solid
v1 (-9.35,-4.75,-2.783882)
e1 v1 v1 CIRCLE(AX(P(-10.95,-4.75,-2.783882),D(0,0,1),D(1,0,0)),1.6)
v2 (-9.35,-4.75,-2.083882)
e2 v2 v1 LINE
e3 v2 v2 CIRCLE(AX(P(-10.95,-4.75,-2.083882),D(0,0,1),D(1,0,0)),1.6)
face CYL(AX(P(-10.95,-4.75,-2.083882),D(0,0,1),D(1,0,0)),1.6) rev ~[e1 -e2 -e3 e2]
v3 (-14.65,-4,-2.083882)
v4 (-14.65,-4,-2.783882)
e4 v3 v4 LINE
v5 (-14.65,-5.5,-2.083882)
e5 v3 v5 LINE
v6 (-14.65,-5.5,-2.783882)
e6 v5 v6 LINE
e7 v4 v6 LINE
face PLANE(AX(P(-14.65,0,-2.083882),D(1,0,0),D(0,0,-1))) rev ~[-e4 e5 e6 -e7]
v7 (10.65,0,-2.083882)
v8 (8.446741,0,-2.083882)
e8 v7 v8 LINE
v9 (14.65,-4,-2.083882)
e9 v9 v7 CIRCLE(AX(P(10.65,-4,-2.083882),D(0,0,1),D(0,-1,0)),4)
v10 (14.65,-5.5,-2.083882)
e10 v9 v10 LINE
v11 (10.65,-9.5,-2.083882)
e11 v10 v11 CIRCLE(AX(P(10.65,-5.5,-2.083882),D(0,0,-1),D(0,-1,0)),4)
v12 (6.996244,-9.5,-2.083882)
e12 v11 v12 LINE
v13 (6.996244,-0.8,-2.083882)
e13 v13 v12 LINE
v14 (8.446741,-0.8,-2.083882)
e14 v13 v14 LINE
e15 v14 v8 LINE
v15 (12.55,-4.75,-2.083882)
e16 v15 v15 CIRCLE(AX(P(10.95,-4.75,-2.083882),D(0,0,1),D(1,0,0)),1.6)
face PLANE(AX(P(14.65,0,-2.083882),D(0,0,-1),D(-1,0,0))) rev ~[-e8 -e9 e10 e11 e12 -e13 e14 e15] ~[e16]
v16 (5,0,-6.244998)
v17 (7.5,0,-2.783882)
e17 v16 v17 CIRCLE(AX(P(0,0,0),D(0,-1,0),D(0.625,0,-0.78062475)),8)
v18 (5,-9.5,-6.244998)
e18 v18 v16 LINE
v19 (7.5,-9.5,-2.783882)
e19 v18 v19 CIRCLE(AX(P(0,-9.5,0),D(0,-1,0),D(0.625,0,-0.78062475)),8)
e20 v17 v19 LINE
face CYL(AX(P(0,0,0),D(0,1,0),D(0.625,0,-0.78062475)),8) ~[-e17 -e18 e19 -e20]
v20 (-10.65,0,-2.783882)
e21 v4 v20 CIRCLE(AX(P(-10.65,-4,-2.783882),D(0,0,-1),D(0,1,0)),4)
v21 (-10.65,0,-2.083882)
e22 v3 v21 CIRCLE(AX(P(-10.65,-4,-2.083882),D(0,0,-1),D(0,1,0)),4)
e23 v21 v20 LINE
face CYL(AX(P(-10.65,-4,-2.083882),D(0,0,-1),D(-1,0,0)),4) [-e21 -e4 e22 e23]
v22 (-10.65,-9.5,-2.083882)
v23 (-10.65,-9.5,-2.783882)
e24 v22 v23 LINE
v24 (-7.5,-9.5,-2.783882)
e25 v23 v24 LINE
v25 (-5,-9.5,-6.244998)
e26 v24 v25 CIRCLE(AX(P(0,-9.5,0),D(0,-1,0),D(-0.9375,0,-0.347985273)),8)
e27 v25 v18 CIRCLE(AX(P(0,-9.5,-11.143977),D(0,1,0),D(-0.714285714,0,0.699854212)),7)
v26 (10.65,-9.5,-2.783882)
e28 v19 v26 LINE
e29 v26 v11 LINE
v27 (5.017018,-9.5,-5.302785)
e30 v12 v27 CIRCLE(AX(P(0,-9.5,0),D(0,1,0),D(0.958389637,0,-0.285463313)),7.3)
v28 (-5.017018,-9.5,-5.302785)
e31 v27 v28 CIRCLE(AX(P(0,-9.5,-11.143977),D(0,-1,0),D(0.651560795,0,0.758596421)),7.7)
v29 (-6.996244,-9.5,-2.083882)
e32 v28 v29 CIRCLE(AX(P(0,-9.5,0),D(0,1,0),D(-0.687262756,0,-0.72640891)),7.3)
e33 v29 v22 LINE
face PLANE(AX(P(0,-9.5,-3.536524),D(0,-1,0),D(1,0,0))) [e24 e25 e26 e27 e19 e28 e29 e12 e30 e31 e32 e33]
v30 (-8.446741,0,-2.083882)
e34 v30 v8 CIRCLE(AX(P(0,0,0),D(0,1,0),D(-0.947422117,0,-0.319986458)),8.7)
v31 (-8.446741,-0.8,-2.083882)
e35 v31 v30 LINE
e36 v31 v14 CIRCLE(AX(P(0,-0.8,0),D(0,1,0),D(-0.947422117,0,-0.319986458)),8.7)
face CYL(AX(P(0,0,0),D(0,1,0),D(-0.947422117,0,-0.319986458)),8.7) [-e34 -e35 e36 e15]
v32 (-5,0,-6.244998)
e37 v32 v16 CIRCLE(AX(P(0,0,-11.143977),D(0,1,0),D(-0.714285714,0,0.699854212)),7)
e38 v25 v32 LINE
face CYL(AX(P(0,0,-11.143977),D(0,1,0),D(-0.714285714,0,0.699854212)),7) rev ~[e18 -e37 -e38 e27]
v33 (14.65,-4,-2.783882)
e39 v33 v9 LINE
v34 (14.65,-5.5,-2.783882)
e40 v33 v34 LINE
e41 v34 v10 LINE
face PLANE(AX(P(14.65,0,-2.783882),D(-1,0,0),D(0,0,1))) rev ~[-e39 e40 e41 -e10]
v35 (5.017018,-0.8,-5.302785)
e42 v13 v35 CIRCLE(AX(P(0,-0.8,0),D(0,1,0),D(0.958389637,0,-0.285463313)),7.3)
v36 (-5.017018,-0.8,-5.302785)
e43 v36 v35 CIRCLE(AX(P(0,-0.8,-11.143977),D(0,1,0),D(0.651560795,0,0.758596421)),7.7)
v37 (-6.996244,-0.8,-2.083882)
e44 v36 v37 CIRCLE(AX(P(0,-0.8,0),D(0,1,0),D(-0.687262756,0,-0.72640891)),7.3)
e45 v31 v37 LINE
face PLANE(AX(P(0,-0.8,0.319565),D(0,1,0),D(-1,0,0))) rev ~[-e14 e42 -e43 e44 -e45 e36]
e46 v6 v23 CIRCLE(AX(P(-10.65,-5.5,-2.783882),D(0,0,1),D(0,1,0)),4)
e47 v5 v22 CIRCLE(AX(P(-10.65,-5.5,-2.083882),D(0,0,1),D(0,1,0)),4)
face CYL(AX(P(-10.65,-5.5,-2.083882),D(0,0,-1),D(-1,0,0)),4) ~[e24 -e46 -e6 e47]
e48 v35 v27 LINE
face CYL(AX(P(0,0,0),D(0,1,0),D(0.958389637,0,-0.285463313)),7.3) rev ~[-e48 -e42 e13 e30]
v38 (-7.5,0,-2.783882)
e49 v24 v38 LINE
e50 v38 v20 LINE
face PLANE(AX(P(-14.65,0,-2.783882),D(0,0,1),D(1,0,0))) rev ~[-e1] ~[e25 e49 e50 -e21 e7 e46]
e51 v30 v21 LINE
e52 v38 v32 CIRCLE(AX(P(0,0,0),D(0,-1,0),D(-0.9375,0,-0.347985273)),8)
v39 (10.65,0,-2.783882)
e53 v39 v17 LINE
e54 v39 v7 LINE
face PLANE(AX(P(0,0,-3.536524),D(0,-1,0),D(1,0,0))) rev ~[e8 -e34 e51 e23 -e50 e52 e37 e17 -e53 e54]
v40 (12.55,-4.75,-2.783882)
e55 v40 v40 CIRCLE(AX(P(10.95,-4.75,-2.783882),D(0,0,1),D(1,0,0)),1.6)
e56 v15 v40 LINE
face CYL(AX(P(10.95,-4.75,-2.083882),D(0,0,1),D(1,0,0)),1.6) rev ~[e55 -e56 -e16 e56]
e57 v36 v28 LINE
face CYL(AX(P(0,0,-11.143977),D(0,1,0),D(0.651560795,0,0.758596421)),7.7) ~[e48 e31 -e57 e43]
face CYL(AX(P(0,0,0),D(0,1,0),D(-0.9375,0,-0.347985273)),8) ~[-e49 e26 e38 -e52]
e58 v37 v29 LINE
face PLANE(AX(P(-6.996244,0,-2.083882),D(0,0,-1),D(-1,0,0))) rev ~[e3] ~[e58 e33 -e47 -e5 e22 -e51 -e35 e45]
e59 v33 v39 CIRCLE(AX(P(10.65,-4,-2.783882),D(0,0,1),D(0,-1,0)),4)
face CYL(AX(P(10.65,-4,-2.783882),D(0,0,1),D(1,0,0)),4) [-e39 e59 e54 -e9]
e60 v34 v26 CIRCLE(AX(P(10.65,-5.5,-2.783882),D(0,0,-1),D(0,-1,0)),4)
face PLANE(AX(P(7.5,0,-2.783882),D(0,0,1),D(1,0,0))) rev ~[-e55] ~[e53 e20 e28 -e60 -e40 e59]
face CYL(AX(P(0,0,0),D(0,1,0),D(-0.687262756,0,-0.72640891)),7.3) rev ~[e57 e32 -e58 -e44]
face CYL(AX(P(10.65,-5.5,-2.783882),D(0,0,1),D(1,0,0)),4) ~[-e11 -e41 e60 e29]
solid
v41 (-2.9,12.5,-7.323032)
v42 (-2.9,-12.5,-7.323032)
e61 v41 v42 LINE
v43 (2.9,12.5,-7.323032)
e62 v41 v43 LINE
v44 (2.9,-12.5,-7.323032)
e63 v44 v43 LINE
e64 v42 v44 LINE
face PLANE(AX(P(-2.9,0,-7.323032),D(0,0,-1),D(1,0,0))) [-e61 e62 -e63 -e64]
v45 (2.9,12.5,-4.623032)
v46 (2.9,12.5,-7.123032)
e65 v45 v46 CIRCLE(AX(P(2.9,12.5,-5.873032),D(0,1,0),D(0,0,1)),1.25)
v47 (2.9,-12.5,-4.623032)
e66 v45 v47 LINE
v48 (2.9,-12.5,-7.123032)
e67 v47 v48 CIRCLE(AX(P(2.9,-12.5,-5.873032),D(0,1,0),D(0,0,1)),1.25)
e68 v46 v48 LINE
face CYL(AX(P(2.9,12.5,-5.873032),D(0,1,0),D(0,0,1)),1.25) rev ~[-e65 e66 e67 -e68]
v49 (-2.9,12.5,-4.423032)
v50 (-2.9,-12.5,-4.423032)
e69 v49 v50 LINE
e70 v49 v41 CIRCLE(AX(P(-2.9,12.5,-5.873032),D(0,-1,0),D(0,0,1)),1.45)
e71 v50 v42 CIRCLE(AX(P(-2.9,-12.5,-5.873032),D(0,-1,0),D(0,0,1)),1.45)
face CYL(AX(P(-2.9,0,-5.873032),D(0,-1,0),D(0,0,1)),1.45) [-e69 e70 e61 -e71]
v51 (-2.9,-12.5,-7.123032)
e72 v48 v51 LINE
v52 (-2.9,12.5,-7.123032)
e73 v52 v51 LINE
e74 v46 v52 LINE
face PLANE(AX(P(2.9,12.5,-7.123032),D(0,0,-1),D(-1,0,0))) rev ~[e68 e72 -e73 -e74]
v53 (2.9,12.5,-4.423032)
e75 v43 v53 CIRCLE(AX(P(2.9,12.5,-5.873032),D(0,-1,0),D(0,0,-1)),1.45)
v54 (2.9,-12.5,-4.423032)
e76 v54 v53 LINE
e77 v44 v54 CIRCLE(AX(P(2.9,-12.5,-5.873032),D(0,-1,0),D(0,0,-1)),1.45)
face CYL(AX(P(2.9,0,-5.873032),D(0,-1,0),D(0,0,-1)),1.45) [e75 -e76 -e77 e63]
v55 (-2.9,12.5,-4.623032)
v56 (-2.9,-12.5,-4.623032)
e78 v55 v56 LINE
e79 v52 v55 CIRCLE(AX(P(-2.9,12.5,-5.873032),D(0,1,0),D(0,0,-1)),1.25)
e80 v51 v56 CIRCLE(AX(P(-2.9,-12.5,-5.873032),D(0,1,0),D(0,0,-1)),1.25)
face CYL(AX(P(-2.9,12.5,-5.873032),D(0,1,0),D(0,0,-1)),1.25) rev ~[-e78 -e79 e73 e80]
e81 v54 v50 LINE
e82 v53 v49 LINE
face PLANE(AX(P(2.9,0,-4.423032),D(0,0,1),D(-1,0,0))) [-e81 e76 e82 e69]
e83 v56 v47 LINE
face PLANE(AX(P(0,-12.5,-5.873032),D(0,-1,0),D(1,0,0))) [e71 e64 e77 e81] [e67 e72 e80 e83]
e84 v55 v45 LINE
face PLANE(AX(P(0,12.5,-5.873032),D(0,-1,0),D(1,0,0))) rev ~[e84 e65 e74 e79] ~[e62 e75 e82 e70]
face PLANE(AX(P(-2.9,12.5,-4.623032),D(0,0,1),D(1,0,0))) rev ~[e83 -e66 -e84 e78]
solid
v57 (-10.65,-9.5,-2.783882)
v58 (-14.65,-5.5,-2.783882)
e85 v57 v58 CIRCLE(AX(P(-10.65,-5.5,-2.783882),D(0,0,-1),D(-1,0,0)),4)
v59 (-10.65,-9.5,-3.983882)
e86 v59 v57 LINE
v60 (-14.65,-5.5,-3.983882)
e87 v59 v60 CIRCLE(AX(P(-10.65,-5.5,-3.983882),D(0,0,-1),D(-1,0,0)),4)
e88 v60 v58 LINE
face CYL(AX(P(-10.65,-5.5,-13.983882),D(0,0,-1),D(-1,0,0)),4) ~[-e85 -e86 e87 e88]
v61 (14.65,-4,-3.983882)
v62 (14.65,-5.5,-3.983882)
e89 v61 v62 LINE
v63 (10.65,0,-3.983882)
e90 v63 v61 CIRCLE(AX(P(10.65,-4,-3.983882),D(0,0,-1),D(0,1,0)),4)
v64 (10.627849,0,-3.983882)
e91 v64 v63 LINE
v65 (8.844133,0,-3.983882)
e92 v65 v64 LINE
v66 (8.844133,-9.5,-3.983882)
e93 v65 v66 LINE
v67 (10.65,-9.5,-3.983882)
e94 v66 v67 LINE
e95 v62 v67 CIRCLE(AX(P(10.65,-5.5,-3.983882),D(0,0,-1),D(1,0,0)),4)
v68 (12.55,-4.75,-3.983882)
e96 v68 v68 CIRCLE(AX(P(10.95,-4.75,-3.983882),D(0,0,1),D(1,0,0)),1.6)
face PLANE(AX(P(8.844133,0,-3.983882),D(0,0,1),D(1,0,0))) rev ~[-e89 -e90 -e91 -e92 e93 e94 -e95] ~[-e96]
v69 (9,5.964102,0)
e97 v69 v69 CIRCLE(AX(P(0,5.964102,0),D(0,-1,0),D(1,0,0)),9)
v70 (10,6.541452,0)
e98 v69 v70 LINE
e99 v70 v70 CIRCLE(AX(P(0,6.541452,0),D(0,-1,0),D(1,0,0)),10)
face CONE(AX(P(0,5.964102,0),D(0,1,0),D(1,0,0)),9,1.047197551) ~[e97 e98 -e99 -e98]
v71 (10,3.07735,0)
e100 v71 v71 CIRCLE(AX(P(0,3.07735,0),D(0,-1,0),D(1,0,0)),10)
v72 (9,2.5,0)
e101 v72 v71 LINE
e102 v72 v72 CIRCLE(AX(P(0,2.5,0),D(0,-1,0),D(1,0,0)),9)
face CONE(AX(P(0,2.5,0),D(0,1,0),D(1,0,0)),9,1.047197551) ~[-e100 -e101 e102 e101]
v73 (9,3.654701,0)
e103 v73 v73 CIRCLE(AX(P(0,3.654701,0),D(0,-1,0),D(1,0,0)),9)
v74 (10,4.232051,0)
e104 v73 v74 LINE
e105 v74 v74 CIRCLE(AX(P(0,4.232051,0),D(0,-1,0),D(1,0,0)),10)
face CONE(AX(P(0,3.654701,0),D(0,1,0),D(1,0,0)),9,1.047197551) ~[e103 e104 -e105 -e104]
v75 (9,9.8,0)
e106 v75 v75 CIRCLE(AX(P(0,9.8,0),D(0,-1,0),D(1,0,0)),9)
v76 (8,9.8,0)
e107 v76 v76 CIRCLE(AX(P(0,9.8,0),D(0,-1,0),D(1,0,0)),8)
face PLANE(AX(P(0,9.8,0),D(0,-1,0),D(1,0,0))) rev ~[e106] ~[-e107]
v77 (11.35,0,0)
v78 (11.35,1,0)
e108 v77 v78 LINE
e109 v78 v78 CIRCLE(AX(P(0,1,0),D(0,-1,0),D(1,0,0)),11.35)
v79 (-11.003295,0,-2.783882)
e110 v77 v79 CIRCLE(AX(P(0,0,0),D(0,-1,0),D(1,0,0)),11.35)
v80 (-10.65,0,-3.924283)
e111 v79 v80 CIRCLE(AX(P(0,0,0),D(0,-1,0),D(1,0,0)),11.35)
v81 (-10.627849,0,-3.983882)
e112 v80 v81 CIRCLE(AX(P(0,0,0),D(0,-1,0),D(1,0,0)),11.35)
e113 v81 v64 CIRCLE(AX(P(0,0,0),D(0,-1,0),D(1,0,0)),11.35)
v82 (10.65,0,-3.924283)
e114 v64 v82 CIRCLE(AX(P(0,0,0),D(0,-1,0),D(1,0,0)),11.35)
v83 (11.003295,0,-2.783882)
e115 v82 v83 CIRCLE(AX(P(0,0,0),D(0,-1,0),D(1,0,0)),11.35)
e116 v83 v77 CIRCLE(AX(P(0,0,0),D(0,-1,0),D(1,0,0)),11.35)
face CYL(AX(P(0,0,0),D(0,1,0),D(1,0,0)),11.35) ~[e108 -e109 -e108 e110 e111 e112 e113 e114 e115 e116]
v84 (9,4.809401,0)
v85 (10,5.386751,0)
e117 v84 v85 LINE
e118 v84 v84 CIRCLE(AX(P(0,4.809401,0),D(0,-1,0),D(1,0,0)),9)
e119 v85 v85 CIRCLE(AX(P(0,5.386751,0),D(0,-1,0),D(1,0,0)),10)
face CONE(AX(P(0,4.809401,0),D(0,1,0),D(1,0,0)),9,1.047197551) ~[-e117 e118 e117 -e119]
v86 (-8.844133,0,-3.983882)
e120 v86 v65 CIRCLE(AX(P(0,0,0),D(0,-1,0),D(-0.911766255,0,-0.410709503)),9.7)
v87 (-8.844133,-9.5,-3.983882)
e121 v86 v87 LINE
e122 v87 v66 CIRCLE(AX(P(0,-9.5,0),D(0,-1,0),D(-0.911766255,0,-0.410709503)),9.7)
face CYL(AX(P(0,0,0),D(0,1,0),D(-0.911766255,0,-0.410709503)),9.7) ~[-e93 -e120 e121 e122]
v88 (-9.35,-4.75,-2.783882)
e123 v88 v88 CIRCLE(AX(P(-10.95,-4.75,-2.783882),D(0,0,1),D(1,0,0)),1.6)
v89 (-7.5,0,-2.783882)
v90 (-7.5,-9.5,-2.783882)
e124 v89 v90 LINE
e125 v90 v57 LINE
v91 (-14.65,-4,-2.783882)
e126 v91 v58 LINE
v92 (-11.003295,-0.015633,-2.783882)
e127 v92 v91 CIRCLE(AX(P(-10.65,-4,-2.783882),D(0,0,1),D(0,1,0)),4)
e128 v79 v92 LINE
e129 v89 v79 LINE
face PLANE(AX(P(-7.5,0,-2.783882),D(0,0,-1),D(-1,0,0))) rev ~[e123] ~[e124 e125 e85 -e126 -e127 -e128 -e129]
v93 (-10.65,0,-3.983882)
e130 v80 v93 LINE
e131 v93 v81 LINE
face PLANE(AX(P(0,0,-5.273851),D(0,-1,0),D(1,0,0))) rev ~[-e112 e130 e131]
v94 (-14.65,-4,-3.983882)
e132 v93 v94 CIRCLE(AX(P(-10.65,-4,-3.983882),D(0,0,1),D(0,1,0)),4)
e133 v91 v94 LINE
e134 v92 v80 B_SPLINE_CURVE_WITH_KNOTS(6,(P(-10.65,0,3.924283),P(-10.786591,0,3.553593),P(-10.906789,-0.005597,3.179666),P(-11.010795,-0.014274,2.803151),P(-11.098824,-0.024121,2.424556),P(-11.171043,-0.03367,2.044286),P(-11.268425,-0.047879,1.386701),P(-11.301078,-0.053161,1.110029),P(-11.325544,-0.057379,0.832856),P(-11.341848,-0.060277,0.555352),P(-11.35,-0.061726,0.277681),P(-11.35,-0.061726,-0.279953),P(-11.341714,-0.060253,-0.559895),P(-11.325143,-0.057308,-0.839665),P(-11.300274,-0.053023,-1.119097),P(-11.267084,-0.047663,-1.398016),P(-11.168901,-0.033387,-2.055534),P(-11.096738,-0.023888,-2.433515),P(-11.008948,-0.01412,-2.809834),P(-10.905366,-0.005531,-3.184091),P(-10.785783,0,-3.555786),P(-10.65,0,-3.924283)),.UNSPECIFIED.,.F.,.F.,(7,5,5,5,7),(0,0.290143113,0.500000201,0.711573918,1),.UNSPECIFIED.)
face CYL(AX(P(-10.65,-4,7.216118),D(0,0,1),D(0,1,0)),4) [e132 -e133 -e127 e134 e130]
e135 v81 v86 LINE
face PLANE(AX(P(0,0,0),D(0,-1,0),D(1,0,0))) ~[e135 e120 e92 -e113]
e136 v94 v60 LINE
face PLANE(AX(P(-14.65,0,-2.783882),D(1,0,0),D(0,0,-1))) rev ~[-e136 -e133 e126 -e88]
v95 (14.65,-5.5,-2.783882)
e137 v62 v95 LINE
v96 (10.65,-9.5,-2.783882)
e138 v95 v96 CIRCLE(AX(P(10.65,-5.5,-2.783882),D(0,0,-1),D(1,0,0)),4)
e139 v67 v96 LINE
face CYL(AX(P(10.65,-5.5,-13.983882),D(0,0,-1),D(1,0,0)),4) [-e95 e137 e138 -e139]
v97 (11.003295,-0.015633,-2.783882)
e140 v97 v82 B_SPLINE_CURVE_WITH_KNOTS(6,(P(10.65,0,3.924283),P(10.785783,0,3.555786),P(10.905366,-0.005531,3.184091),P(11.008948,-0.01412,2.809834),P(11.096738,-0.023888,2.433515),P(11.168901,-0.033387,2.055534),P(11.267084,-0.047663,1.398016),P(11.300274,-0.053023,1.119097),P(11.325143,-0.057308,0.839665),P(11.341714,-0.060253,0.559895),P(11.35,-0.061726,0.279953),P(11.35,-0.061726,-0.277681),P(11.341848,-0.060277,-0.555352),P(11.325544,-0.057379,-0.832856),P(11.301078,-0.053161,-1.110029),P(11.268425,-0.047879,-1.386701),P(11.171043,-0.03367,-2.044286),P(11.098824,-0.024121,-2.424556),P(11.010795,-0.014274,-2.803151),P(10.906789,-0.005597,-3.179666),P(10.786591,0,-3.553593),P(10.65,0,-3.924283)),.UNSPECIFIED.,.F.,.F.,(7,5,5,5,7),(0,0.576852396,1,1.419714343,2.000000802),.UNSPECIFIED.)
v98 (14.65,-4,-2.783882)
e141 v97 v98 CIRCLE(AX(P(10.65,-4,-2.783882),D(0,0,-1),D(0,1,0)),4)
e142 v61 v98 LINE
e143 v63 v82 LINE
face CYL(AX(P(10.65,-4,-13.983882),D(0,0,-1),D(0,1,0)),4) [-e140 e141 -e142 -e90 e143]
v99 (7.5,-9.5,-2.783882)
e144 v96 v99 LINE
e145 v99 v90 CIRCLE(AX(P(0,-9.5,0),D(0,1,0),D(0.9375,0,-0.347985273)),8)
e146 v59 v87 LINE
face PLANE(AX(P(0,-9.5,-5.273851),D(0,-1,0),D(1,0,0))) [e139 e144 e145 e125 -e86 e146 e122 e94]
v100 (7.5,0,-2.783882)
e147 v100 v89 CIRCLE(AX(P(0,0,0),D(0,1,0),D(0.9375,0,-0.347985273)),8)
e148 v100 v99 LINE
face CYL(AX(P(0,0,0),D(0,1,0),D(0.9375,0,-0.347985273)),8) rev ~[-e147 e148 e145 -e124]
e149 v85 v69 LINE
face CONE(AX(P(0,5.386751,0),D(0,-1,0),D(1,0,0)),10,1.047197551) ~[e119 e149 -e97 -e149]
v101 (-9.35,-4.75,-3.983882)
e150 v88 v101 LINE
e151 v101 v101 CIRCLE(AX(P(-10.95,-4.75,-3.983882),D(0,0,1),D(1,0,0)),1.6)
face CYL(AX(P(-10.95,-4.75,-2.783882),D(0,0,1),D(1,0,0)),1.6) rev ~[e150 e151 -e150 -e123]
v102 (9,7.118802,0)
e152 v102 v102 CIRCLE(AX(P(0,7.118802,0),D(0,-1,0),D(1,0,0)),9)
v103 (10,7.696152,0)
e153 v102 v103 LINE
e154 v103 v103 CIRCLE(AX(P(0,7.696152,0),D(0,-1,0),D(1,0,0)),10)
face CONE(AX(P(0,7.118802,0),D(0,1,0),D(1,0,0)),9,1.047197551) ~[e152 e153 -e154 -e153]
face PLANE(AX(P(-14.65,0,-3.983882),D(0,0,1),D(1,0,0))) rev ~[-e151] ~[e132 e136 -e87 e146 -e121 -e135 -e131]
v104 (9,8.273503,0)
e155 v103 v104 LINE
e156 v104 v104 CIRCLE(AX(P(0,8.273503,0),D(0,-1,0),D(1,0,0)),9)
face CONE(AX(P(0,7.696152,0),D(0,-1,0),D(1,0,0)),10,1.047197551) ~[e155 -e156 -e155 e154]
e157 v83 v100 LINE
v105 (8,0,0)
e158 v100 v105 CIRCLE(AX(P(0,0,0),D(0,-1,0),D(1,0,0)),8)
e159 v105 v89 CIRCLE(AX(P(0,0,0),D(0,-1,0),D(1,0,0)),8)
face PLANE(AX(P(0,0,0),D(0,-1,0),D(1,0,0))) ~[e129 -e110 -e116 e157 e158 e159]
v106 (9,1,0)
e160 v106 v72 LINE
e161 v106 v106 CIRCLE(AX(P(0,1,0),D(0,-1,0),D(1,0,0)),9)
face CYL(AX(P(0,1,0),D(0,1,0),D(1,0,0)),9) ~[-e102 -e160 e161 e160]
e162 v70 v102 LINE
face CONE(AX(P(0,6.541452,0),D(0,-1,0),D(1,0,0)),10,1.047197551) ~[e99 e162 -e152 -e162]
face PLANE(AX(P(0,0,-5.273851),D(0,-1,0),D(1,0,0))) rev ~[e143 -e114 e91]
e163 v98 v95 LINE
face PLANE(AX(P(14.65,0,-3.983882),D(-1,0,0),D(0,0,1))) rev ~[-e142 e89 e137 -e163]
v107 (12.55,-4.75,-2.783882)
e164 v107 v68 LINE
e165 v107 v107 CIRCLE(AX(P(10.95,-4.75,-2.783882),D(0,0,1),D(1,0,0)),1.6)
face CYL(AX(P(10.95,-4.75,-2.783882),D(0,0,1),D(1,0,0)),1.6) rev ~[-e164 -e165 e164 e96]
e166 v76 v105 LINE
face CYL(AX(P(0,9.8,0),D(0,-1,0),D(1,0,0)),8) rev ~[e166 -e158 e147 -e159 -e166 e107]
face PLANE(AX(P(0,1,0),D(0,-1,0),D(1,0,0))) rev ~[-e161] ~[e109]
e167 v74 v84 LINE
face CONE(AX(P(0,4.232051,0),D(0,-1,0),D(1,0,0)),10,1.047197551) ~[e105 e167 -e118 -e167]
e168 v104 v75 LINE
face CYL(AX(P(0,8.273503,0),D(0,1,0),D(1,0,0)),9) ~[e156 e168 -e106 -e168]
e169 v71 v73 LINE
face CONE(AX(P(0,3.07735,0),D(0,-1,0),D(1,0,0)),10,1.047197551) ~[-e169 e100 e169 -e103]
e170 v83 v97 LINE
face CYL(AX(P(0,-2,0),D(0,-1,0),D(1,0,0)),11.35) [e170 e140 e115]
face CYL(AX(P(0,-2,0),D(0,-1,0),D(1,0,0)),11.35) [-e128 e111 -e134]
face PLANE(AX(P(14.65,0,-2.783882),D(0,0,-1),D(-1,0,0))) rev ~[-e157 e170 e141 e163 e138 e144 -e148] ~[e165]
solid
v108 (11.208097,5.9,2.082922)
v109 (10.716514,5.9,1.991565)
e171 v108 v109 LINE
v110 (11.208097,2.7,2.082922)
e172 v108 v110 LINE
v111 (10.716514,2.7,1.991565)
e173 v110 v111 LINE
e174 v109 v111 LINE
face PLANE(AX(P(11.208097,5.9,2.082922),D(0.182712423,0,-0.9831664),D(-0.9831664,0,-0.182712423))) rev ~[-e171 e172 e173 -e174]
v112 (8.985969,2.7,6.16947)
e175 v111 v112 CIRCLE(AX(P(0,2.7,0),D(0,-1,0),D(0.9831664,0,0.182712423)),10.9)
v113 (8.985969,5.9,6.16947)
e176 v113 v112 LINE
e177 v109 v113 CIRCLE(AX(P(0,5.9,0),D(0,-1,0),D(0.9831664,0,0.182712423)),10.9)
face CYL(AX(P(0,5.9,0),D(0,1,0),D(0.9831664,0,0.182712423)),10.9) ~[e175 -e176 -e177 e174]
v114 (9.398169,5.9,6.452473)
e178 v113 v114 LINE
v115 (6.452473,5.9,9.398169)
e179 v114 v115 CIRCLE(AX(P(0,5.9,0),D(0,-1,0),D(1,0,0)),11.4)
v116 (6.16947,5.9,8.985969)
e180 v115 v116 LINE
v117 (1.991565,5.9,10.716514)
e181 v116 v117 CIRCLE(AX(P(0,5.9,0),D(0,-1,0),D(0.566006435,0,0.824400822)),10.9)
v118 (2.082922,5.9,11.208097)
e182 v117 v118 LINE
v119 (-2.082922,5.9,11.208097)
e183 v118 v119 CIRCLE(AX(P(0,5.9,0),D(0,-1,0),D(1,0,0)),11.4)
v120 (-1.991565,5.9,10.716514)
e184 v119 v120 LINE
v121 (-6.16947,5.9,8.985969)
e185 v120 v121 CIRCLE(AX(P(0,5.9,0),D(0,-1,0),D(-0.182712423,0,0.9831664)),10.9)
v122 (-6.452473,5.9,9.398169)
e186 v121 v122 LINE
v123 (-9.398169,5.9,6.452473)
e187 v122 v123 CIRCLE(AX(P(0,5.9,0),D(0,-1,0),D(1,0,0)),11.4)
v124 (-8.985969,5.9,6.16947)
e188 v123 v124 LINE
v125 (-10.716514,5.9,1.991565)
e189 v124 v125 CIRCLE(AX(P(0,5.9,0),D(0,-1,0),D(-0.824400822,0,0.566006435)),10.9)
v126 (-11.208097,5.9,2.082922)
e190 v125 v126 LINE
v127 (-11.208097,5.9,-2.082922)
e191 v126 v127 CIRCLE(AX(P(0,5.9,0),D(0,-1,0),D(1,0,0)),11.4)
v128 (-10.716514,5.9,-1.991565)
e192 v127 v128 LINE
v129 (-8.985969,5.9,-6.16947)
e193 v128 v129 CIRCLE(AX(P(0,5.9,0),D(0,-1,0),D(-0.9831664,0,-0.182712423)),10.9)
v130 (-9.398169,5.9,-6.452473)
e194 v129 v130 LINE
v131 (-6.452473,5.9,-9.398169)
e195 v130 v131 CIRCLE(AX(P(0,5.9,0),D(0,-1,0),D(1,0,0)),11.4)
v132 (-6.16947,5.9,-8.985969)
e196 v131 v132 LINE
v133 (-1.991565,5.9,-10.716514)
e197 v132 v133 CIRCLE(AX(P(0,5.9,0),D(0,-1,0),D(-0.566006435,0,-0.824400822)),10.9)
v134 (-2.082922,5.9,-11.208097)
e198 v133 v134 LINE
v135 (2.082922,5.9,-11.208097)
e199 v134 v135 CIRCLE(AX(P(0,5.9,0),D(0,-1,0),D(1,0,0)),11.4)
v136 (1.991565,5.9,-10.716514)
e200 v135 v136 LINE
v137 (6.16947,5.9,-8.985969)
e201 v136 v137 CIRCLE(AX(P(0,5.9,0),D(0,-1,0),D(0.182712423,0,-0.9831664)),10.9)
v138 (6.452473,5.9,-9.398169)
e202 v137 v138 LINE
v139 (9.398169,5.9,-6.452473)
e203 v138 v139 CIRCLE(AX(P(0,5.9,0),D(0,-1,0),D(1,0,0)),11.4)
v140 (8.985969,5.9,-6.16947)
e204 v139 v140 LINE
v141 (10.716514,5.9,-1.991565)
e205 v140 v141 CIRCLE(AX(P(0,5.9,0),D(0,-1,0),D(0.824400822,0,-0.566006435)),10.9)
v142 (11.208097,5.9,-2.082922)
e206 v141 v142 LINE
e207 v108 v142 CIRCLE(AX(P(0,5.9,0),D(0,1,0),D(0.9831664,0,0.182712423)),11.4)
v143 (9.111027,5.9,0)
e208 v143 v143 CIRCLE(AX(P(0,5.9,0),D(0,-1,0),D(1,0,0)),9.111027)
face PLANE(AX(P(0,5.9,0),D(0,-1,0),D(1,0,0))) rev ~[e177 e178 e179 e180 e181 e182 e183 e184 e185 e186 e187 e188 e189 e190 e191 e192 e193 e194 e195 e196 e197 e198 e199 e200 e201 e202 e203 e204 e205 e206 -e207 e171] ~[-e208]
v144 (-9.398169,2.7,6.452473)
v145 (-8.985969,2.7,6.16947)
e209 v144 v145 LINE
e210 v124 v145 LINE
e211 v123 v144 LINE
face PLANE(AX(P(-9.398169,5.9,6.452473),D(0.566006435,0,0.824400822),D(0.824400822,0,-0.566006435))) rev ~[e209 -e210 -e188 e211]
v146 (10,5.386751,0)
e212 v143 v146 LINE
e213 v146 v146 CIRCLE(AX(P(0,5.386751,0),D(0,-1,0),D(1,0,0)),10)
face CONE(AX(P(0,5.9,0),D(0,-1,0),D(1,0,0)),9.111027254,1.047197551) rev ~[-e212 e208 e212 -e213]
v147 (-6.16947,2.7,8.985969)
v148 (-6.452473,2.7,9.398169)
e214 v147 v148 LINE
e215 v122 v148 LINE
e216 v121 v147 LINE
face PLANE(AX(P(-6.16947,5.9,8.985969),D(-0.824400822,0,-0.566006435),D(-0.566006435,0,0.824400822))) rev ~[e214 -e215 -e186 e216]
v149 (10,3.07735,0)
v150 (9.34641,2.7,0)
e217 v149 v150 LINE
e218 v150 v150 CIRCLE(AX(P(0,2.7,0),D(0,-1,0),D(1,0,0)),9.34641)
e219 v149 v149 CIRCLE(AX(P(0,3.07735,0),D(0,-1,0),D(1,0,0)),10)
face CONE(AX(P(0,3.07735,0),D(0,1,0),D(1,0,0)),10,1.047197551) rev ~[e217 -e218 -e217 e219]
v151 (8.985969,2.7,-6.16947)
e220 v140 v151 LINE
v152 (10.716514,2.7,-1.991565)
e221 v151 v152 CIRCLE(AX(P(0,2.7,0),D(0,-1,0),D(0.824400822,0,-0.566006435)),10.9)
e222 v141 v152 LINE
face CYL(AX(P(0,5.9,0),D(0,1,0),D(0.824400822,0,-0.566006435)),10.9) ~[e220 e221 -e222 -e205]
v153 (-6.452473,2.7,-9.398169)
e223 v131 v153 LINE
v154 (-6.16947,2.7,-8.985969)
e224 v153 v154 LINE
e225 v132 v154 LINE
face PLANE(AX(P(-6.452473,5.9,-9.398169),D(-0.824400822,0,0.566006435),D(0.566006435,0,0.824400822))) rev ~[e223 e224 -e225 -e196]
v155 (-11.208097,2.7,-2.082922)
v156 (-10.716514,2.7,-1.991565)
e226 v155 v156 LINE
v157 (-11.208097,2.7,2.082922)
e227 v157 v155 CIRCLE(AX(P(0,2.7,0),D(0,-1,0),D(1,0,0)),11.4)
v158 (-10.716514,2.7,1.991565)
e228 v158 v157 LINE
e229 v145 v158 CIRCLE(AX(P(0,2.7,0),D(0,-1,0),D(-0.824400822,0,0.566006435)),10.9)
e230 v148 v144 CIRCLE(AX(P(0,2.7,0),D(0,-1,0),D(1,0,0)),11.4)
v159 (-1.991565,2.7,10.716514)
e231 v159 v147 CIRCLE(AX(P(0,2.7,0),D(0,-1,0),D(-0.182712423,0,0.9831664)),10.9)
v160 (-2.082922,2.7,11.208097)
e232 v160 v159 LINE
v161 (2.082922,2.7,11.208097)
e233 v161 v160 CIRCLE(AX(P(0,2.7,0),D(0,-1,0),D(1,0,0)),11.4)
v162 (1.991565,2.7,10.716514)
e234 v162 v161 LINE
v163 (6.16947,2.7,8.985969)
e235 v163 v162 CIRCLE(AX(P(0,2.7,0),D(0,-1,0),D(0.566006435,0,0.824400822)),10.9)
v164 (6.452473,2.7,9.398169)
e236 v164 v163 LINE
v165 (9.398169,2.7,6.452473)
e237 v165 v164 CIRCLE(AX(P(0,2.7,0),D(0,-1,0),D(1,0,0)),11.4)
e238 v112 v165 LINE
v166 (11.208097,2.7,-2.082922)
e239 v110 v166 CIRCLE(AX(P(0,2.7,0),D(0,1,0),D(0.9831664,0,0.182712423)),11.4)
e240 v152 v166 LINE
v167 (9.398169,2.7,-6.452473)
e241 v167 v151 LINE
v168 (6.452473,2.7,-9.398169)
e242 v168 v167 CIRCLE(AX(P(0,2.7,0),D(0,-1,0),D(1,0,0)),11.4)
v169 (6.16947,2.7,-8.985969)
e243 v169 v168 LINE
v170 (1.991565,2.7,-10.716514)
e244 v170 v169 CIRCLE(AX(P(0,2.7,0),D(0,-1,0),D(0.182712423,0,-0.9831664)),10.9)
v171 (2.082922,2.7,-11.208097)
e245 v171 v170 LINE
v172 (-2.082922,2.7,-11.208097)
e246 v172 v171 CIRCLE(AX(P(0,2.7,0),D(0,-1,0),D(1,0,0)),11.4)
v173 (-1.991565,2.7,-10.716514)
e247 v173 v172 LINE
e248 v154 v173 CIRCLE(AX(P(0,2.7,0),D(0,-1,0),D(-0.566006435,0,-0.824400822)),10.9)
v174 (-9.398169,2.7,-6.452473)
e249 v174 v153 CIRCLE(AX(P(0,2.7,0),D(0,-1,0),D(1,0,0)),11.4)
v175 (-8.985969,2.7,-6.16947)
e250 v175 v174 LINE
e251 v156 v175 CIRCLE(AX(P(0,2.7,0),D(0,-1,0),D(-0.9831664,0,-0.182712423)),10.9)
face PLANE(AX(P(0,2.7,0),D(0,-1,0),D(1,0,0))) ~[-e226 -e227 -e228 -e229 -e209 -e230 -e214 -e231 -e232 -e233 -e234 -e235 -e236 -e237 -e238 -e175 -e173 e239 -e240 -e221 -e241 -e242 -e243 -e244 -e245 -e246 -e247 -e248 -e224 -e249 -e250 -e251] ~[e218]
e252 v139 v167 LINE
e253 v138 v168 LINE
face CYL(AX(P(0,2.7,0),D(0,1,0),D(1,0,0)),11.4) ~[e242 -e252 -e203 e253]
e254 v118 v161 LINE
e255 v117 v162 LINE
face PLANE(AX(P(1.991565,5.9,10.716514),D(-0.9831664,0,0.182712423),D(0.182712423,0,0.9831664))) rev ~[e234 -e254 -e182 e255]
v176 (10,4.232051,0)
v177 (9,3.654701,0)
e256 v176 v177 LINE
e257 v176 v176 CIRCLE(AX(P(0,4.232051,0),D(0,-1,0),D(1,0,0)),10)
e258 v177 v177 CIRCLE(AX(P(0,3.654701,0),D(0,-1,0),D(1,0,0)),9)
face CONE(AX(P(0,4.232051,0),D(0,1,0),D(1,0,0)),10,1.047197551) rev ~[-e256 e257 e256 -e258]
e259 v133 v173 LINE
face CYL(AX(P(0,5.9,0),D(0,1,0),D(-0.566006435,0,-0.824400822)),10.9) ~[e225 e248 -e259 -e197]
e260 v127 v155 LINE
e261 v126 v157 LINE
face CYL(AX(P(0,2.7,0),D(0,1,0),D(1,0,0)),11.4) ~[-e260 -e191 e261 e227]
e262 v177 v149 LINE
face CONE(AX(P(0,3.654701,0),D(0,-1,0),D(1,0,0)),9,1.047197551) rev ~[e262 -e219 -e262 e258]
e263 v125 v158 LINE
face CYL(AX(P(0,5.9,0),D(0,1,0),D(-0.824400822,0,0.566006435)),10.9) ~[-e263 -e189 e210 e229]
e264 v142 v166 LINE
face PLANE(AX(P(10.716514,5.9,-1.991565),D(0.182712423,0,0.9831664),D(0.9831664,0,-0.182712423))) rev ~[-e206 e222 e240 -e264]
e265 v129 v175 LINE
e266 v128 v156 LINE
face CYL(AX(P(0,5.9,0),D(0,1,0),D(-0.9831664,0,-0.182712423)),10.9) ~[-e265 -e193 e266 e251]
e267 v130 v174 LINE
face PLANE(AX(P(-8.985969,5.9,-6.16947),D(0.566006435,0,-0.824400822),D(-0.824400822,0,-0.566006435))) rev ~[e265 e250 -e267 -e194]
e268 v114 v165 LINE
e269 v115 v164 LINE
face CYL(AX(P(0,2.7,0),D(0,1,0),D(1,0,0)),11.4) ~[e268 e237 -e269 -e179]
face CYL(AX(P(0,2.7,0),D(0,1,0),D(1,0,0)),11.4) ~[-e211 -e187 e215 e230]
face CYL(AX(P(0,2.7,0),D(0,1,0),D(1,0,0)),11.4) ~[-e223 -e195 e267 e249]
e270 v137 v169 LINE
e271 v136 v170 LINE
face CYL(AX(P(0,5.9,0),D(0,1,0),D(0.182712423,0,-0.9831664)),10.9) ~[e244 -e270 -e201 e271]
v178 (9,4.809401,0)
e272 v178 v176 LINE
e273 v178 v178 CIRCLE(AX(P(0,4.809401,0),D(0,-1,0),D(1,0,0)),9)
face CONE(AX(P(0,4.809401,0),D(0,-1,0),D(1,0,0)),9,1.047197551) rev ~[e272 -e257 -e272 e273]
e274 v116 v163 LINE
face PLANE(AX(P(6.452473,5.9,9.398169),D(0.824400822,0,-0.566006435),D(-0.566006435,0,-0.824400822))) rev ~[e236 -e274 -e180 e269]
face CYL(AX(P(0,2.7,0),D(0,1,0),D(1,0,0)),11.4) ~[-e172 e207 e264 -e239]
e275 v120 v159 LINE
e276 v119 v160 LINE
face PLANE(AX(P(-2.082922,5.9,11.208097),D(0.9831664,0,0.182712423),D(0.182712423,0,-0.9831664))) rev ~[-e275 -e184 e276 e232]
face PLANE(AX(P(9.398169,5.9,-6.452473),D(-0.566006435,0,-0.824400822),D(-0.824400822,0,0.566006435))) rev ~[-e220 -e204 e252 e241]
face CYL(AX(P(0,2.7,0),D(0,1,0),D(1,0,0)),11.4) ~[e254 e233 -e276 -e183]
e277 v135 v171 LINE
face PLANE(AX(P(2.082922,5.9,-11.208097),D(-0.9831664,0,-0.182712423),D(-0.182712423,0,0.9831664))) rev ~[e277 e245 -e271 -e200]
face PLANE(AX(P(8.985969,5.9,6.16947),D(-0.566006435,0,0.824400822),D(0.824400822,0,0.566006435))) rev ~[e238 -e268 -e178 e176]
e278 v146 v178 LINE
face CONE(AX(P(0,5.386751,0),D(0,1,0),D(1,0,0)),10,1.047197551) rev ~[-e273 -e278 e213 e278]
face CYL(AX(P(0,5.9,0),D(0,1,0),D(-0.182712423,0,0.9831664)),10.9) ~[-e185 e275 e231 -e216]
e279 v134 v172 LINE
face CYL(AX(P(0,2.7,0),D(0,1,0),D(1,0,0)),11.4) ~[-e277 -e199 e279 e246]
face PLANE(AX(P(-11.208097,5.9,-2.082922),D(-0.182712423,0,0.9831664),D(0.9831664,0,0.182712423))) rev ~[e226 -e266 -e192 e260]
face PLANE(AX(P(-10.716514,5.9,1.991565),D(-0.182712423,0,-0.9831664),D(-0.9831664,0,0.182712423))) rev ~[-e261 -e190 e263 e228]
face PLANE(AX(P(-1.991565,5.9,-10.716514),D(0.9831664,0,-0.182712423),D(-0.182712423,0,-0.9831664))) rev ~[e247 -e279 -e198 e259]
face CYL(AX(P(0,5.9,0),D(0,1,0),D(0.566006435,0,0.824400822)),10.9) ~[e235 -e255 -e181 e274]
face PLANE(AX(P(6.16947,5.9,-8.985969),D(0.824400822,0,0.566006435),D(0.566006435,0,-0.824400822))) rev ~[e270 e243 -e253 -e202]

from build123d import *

# Parameters (mm, degrees)
F3_DEPTH     = 9.5
F4_T1_DEPTH  = 21.2
F4_T6_DEPTH  = 21.2
F4_S7_R      = 11.35
F4_T8_DEPTH  = 12
F4_T12_DEPTH = 21.2
F4_S13_R     = 11.35
F4_T14_DEPTH = 12
F5_R         = 1.6
F6_DEPTH     = 1.2
F8_DEPTH     = 9.5
F10_DEPTH    = 0.8
F11_R        = 4
F12_R        = 1.6
F13_DEPTH    = 0.7
F17_DEPTH    = 3.2
F19_DEPTH    = 12.5
F21_DEPTH    = 25


# Not quite as in the source:
# - a fillet or chamfer that OpenCascade refuses, or shapes differently, is made with other operations: its cross-section is extruded or revolved along the edge and cut away or added


with BuildPart() as f1:
    # F0 (on Top) → F1 (revolve)
    with BuildSketch(Plane.XY):
        Polygon((9, 9.8), (8, 9.8), (8, 0), (11.35, 0), (11.35, 1), (9, 1), (9, 2.5), (10, 3.0773502692), (9, 3.6547005384), (10, 4.2320508076), (9, 4.8094010768), (10, 5.3867513459), (9, 5.9641016151), (10, 6.5414518843), (9, 7.1188021535), (10, 7.6961524227), (9, 8.2735026919), align=None)
    revolve(axis=Axis((0, 0, 0), (0, -1, 0)))

    # F2 (on face) → F3 (join)
    with BuildSketch(Plane.XZ):
        with BuildLine():
            ThreePointArc((7.5, -2.7838821814), (0, -8), (-7.5, -2.7838821814))
            Line((-7.5, -2.7838821814), (-14.65, -2.7838821814))
            Line((-14.65, -2.7838821814), (-14.65, -3.9838821814))
            Line((-14.65, -3.9838821814), (-8.8441326745, -3.9838821814))
            ThreePointArc((-8.8441326745, -3.9838821814), (0, -9.7), (8.8441326745, -3.9838821814))
            Line((8.8441326745, -3.9838821814), (14.65, -3.9838821814))
            Line((14.65, -3.9838821814), (14.65, -2.7838821814))
            Line((14.65, -2.7838821814), (7.5, -2.7838821814))
        make_face()
    extrude(amount=F3_DEPTH)

    # F4: fillet of radius 4 on 4 edges, made by hand

    # F4_s2 → F4_t1 (cut)
    with BuildSketch(Plane.XY.offset(-13.9838821814)):
        with BuildLine():
            ThreePointArc((14.65, -5.5), (13.4784271247, -8.3284271247), (10.65, -9.5))
            Line((10.65, -9.5), (14.65, -9.5))
            Line((14.65, -9.5), (14.65, -5.5))
        make_face()
        with BuildLine():
            ThreePointArc((-14.65, -5.5), (-13.4784271247, -8.3284271247), (-10.65, -9.5))
            Line((-10.65, -9.5), (-14.65, -9.5))
            Line((-14.65, -9.5), (-14.65, -5.5))
        make_face()
    extrude(amount=F4_T1_DEPTH, mode=Mode.SUBTRACT)


with BuildPart() as f4_tool4:
    # F4_s5 → F4_t6 (new body)
    with BuildSketch(Plane.XY.offset(-13.9838821814)):
        with BuildLine():
            ThreePointArc((10.65, 0), (13.4784271247, -1.1715728753), (14.65, -4))
            Line((14.65, -4), (14.65, 0))
            Line((14.65, 0), (10.65, 0))
        make_face()
    extrude(amount=F4_T6_DEPTH)

    # F4_s7 → F4_t8 (cut, symmetric)
    with BuildSketch(Plane.XZ.offset(2)):
        Circle(F4_S7_R)
    extrude(amount=F4_T8_DEPTH, both=True, mode=Mode.SUBTRACT)


with BuildPart() as f1_1:
    add(f1.part)

    # F4_t3: cut F4_tool4
    add(f4_tool4.part, mode=Mode.SUBTRACT)


with BuildPart() as f4_tool10:
    # F4_s11 → F4_t12 (new body)
    with BuildSketch(Plane.XY.offset(7.2161178186)):
        with BuildLine():
            ThreePointArc((-10.65, 0), (-13.4784271247, -1.1715728753), (-14.65, -4))
            Line((-14.65, -4), (-14.65, 0))
            Line((-14.65, 0), (-10.65, 0))
        make_face()
    extrude(amount=-F4_T12_DEPTH)

    # F4_s13 → F4_t14 (cut, symmetric)
    with BuildSketch(Plane.XZ.offset(2)):
        Circle(F4_S13_R)
    extrude(amount=F4_T14_DEPTH, both=True, mode=Mode.SUBTRACT)


with BuildPart() as f1_2:
    add(f1_1.part)

    # F4_t9: cut F4_tool10
    add(f4_tool10.part, mode=Mode.SUBTRACT)

    # F5 (on face) → F6 (cut, through all)
    with BuildSketch(Plane.XY.offset(-2.7838821814)):
        with Locations((10.95, -4.75)):
            Circle(F5_R)
        with Locations((-10.95, -4.75)):
            Circle(F5_R)
    extrude(amount=-F6_DEPTH, mode=Mode.SUBTRACT)


with BuildPart() as f8:
    # F7 (on face) → F8 (new body)
    with BuildSketch(Plane.XZ):
        with BuildLine():
            ThreePointArc((5, -6.2449979984), (6.4851623476, -4.6843003026), (7.5, -2.7838821814))
            Line((7.5, -2.7838821814), (14.65, -2.7838821814))
            Line((14.65, -2.7838821814), (14.65, -2.0838821814))
            Line((14.65, -2.0838821814), (6.9962443535, -2.0838821814))
            ThreePointArc((6.9962443535, -2.0838821814), (6.218516923, -3.8236170412), (5.0170181209, -5.3027850394))
            ThreePointArc((5.0170181209, -5.3027850394), (0, -3.443977484), (-5.0170181209, -5.3027850394))
            ThreePointArc((-5.0170181209, -5.3027850394), (-6.218516923, -3.8236170412), (-6.9962443535, -2.0838821814))
            Line((-6.9962443535, -2.0838821814), (-14.65, -2.0838821814))
            Line((-14.65, -2.0838821814), (-14.65, -2.7838821814))
            Line((-14.65, -2.7838821814), (-7.5, -2.7838821814))
            ThreePointArc((-7.5, -2.7838821814), (-6.4851623476, -4.6843003026), (-5, -6.2449979984))
            ThreePointArc((-5, -6.2449979984), (0, -4.143977484), (5, -6.2449979984))
        make_face()
    extrude(amount=F8_DEPTH)

    # F9 (on face) → F10 (join)
    with BuildSketch(Plane(origin=(0, 0, 0), x_dir=(-1, 0, 0), z_dir=(0, 1, 0))):
        with BuildLine():
            ThreePointArc((5, -6.2449979984), (6.4851623476, -4.6843003026), (7.5, -2.7838821814))
            Line((7.5, -2.7838821814), (8.242572414, -2.7838821814))
            ThreePointArc((8.242572414, -2.7838821814), (0, 8.7), (-8.242572414, -2.7838821814))
            Line((-8.242572414, -2.7838821814), (-7.5, -2.7838821814))
            ThreePointArc((-7.5, -2.7838821814), (-6.4851623476, -4.6843003026), (-5, -6.2449979984))
            ThreePointArc((-5, -6.2449979984), (0, -4.143977484), (5, -6.2449979984))
        make_face()
    extrude(amount=-F10_DEPTH)

    # F11
    f11_edges = [f8.edges().sort_by_distance(p)[0] for p in [
        (14.65, -9.5, -2.433882),
        (14.65, 0, -2.433882),
        (-14.65, 0, -2.433882),
        (-14.65, -9.5, -2.433882),
    ]]
    fillet(f11_edges, radius=F11_R)

    # F12 (on face) → F13 (cut, through all)
    with BuildSketch(Plane.XY.offset(-2.0838821814)):
        with Locations((10.95, -4.75)):
            Circle(F12_R)
        with Locations((-10.95, -4.75)):
            Circle(F12_R)
    extrude(amount=-F13_DEPTH, mode=Mode.SUBTRACT)


with BuildPart() as f15:
    # F14 (on Top) → F15 (revolve)
    with BuildSketch(Plane.XY):
        Polygon((9.1110272543, 5.9), (10, 5.3867513459), (9, 4.8094010768), (10, 4.2320508076), (9, 3.6547005384), (10, 3.0773502692), (9.3464101615, 2.7), (11.4, 2.7), (11.4, 5.9), align=None)
    revolve(axis=Axis((0, 0, 0), (0, -1, 0)))

    # F16 (on face) → F17 (cut, through all)
    with BuildSketch(Plane(origin=(0, 5.9, 0), x_dir=(-1, 0, 0), z_dir=(0, 1, 0))):
        with BuildLine():
            Line((-1.9915654145, 10.7165137615), (-2.0829216262, 11.2080969615))
            ThreePointArc((-2.0829216262, 11.2080969615), (-4.362591129, 10.5322266706), (-6.4524733591, 9.3981693723))
            Line((-6.4524733591, 9.3981693723), (-6.1694701416, 8.9859689612))
            ThreePointArc((-6.1694701416, 8.9859689612), (-4.1712494128, 10.0702869044), (-1.9915654145, 10.7165137615))
        make_face()
        with BuildLine():
            Line((2.0829216262, 11.2080969615), (1.9915654145, 10.7165137615))
            ThreePointArc((1.9915654145, 10.7165137615), (4.1712494128, 10.0702869044), (6.1694701416, 8.9859689612))
            Line((6.1694701416, 8.9859689612), (6.4524733591, 9.3981693723))
            ThreePointArc((6.4524733591, 9.3981693723), (4.362591129, 10.5322266706), (2.0829216262, 11.2080969615))
        make_face()
        with BuildLine():
            ThreePointArc((-10.7165137615, 1.9915654145), (-10.0702869044, 4.1712494128), (-8.9859689612, 6.1694701416))
            Line((-8.9859689612, 6.1694701416), (-9.3981693723, 6.4524733591))
            ThreePointArc((-9.3981693723, 6.4524733591), (-10.5322266706, 4.362591129), (-11.2080969615, 2.0829216262))
            Line((-11.2080969615, 2.0829216262), (-10.7165137615, 1.9915654145))
        make_face()
        with BuildLine():
            ThreePointArc((-8.9859689612, -6.1694701416), (-10.0702869044, -4.1712494128), (-10.7165137615, -1.9915654145))
            Line((-10.7165137615, -1.9915654145), (-11.2080969615, -2.0829216262))
            ThreePointArc((-11.2080969615, -2.0829216262), (-10.5322266706, -4.362591129), (-9.3981693723, -6.4524733591))
            Line((-9.3981693723, -6.4524733591), (-8.9859689612, -6.1694701416))
        make_face()
        with BuildLine():
            ThreePointArc((-1.9915654145, -10.7165137615), (-4.1712494128, -10.0702869044), (-6.1694701416, -8.9859689612))
            Line((-6.1694701416, -8.9859689612), (-6.4524733591, -9.3981693723))
            ThreePointArc((-6.4524733591, -9.3981693723), (-4.362591129, -10.5322266706), (-2.0829216262, -11.2080969615))
            Line((-2.0829216262, -11.2080969615), (-1.9915654145, -10.7165137615))
        make_face()
        with BuildLine():
            ThreePointArc((6.1694701416, -8.9859689612), (4.1712494128, -10.0702869044), (1.9915654145, -10.7165137615))
            Line((1.9915654145, -10.7165137615), (2.0829216262, -11.2080969615))
            ThreePointArc((2.0829216262, -11.2080969615), (4.362591129, -10.5322266706), (6.4524733591, -9.3981693723))
            Line((6.4524733591, -9.3981693723), (6.1694701416, -8.9859689612))
        make_face()
        with BuildLine():
            ThreePointArc((10.7165137615, -1.9915654145), (10.0702869044, -4.1712494128), (8.9859689612, -6.1694701416))
            Line((8.9859689612, -6.1694701416), (9.3981693723, -6.4524733591))
            ThreePointArc((9.3981693723, -6.4524733591), (10.5322266706, -4.362591129), (11.2080969615, -2.0829216262))
            Line((11.2080969615, -2.0829216262), (10.7165137615, -1.9915654145))
        make_face()
        with BuildLine():
            ThreePointArc((8.9859689612, 6.1694701416), (10.0702869044, 4.1712494128), (10.7165137615, 1.9915654145))
            Line((10.7165137615, 1.9915654145), (11.2080969615, 2.0829216262))
            ThreePointArc((11.2080969615, 2.0829216262), (10.5322266706, 4.362591129), (9.3981693723, 6.4524733591))
            Line((9.3981693723, 6.4524733591), (8.9859689612, 6.1694701416))
        make_face()
    extrude(amount=-F17_DEPTH, mode=Mode.SUBTRACT)


with BuildPart() as f19:
    # F18 (on Front) → F19 (new body, symmetric)
    with BuildSketch(Plane.XZ):
        with BuildLine():
            Line((2.9, -4.4230315851), (-2.9, -4.4230315851))
            ThreePointArc((-2.9, -4.4230315851), (-4.35, -5.8730315851), (-2.9, -7.3230315851))
            Line((-2.9, -7.3230315851), (2.9, -7.3230315851))
            ThreePointArc((2.9, -7.3230315851), (4.35, -5.8730315851), (2.9, -4.4230315851))
        make_face()
    extrude(amount=F19_DEPTH, both=True)

    # F20 (on face) → F21 (cut, through all)
    with BuildSketch(Plane(origin=(0, 12.5, 0), x_dir=(-1, 0, 0), z_dir=(0, 1, 0))):
        with BuildLine():
            ThreePointArc((2.9, -7.1230315851), (4.15, -5.8730315851), (2.9, -4.6230315851))
            Line((2.9, -4.6230315851), (-2.9, -4.6230315851))
            ThreePointArc((-2.9, -4.6230315851), (-4.15, -5.8730315851), (-2.9, -7.1230315851))
            Line((-2.9, -7.1230315851), (2.9, -7.1230315851))
        make_face()
    extrude(amount=-F21_DEPTH, mode=Mode.SUBTRACT)


solid = Compound([f1_2.part, f8.part, f15.part, f19.part])
